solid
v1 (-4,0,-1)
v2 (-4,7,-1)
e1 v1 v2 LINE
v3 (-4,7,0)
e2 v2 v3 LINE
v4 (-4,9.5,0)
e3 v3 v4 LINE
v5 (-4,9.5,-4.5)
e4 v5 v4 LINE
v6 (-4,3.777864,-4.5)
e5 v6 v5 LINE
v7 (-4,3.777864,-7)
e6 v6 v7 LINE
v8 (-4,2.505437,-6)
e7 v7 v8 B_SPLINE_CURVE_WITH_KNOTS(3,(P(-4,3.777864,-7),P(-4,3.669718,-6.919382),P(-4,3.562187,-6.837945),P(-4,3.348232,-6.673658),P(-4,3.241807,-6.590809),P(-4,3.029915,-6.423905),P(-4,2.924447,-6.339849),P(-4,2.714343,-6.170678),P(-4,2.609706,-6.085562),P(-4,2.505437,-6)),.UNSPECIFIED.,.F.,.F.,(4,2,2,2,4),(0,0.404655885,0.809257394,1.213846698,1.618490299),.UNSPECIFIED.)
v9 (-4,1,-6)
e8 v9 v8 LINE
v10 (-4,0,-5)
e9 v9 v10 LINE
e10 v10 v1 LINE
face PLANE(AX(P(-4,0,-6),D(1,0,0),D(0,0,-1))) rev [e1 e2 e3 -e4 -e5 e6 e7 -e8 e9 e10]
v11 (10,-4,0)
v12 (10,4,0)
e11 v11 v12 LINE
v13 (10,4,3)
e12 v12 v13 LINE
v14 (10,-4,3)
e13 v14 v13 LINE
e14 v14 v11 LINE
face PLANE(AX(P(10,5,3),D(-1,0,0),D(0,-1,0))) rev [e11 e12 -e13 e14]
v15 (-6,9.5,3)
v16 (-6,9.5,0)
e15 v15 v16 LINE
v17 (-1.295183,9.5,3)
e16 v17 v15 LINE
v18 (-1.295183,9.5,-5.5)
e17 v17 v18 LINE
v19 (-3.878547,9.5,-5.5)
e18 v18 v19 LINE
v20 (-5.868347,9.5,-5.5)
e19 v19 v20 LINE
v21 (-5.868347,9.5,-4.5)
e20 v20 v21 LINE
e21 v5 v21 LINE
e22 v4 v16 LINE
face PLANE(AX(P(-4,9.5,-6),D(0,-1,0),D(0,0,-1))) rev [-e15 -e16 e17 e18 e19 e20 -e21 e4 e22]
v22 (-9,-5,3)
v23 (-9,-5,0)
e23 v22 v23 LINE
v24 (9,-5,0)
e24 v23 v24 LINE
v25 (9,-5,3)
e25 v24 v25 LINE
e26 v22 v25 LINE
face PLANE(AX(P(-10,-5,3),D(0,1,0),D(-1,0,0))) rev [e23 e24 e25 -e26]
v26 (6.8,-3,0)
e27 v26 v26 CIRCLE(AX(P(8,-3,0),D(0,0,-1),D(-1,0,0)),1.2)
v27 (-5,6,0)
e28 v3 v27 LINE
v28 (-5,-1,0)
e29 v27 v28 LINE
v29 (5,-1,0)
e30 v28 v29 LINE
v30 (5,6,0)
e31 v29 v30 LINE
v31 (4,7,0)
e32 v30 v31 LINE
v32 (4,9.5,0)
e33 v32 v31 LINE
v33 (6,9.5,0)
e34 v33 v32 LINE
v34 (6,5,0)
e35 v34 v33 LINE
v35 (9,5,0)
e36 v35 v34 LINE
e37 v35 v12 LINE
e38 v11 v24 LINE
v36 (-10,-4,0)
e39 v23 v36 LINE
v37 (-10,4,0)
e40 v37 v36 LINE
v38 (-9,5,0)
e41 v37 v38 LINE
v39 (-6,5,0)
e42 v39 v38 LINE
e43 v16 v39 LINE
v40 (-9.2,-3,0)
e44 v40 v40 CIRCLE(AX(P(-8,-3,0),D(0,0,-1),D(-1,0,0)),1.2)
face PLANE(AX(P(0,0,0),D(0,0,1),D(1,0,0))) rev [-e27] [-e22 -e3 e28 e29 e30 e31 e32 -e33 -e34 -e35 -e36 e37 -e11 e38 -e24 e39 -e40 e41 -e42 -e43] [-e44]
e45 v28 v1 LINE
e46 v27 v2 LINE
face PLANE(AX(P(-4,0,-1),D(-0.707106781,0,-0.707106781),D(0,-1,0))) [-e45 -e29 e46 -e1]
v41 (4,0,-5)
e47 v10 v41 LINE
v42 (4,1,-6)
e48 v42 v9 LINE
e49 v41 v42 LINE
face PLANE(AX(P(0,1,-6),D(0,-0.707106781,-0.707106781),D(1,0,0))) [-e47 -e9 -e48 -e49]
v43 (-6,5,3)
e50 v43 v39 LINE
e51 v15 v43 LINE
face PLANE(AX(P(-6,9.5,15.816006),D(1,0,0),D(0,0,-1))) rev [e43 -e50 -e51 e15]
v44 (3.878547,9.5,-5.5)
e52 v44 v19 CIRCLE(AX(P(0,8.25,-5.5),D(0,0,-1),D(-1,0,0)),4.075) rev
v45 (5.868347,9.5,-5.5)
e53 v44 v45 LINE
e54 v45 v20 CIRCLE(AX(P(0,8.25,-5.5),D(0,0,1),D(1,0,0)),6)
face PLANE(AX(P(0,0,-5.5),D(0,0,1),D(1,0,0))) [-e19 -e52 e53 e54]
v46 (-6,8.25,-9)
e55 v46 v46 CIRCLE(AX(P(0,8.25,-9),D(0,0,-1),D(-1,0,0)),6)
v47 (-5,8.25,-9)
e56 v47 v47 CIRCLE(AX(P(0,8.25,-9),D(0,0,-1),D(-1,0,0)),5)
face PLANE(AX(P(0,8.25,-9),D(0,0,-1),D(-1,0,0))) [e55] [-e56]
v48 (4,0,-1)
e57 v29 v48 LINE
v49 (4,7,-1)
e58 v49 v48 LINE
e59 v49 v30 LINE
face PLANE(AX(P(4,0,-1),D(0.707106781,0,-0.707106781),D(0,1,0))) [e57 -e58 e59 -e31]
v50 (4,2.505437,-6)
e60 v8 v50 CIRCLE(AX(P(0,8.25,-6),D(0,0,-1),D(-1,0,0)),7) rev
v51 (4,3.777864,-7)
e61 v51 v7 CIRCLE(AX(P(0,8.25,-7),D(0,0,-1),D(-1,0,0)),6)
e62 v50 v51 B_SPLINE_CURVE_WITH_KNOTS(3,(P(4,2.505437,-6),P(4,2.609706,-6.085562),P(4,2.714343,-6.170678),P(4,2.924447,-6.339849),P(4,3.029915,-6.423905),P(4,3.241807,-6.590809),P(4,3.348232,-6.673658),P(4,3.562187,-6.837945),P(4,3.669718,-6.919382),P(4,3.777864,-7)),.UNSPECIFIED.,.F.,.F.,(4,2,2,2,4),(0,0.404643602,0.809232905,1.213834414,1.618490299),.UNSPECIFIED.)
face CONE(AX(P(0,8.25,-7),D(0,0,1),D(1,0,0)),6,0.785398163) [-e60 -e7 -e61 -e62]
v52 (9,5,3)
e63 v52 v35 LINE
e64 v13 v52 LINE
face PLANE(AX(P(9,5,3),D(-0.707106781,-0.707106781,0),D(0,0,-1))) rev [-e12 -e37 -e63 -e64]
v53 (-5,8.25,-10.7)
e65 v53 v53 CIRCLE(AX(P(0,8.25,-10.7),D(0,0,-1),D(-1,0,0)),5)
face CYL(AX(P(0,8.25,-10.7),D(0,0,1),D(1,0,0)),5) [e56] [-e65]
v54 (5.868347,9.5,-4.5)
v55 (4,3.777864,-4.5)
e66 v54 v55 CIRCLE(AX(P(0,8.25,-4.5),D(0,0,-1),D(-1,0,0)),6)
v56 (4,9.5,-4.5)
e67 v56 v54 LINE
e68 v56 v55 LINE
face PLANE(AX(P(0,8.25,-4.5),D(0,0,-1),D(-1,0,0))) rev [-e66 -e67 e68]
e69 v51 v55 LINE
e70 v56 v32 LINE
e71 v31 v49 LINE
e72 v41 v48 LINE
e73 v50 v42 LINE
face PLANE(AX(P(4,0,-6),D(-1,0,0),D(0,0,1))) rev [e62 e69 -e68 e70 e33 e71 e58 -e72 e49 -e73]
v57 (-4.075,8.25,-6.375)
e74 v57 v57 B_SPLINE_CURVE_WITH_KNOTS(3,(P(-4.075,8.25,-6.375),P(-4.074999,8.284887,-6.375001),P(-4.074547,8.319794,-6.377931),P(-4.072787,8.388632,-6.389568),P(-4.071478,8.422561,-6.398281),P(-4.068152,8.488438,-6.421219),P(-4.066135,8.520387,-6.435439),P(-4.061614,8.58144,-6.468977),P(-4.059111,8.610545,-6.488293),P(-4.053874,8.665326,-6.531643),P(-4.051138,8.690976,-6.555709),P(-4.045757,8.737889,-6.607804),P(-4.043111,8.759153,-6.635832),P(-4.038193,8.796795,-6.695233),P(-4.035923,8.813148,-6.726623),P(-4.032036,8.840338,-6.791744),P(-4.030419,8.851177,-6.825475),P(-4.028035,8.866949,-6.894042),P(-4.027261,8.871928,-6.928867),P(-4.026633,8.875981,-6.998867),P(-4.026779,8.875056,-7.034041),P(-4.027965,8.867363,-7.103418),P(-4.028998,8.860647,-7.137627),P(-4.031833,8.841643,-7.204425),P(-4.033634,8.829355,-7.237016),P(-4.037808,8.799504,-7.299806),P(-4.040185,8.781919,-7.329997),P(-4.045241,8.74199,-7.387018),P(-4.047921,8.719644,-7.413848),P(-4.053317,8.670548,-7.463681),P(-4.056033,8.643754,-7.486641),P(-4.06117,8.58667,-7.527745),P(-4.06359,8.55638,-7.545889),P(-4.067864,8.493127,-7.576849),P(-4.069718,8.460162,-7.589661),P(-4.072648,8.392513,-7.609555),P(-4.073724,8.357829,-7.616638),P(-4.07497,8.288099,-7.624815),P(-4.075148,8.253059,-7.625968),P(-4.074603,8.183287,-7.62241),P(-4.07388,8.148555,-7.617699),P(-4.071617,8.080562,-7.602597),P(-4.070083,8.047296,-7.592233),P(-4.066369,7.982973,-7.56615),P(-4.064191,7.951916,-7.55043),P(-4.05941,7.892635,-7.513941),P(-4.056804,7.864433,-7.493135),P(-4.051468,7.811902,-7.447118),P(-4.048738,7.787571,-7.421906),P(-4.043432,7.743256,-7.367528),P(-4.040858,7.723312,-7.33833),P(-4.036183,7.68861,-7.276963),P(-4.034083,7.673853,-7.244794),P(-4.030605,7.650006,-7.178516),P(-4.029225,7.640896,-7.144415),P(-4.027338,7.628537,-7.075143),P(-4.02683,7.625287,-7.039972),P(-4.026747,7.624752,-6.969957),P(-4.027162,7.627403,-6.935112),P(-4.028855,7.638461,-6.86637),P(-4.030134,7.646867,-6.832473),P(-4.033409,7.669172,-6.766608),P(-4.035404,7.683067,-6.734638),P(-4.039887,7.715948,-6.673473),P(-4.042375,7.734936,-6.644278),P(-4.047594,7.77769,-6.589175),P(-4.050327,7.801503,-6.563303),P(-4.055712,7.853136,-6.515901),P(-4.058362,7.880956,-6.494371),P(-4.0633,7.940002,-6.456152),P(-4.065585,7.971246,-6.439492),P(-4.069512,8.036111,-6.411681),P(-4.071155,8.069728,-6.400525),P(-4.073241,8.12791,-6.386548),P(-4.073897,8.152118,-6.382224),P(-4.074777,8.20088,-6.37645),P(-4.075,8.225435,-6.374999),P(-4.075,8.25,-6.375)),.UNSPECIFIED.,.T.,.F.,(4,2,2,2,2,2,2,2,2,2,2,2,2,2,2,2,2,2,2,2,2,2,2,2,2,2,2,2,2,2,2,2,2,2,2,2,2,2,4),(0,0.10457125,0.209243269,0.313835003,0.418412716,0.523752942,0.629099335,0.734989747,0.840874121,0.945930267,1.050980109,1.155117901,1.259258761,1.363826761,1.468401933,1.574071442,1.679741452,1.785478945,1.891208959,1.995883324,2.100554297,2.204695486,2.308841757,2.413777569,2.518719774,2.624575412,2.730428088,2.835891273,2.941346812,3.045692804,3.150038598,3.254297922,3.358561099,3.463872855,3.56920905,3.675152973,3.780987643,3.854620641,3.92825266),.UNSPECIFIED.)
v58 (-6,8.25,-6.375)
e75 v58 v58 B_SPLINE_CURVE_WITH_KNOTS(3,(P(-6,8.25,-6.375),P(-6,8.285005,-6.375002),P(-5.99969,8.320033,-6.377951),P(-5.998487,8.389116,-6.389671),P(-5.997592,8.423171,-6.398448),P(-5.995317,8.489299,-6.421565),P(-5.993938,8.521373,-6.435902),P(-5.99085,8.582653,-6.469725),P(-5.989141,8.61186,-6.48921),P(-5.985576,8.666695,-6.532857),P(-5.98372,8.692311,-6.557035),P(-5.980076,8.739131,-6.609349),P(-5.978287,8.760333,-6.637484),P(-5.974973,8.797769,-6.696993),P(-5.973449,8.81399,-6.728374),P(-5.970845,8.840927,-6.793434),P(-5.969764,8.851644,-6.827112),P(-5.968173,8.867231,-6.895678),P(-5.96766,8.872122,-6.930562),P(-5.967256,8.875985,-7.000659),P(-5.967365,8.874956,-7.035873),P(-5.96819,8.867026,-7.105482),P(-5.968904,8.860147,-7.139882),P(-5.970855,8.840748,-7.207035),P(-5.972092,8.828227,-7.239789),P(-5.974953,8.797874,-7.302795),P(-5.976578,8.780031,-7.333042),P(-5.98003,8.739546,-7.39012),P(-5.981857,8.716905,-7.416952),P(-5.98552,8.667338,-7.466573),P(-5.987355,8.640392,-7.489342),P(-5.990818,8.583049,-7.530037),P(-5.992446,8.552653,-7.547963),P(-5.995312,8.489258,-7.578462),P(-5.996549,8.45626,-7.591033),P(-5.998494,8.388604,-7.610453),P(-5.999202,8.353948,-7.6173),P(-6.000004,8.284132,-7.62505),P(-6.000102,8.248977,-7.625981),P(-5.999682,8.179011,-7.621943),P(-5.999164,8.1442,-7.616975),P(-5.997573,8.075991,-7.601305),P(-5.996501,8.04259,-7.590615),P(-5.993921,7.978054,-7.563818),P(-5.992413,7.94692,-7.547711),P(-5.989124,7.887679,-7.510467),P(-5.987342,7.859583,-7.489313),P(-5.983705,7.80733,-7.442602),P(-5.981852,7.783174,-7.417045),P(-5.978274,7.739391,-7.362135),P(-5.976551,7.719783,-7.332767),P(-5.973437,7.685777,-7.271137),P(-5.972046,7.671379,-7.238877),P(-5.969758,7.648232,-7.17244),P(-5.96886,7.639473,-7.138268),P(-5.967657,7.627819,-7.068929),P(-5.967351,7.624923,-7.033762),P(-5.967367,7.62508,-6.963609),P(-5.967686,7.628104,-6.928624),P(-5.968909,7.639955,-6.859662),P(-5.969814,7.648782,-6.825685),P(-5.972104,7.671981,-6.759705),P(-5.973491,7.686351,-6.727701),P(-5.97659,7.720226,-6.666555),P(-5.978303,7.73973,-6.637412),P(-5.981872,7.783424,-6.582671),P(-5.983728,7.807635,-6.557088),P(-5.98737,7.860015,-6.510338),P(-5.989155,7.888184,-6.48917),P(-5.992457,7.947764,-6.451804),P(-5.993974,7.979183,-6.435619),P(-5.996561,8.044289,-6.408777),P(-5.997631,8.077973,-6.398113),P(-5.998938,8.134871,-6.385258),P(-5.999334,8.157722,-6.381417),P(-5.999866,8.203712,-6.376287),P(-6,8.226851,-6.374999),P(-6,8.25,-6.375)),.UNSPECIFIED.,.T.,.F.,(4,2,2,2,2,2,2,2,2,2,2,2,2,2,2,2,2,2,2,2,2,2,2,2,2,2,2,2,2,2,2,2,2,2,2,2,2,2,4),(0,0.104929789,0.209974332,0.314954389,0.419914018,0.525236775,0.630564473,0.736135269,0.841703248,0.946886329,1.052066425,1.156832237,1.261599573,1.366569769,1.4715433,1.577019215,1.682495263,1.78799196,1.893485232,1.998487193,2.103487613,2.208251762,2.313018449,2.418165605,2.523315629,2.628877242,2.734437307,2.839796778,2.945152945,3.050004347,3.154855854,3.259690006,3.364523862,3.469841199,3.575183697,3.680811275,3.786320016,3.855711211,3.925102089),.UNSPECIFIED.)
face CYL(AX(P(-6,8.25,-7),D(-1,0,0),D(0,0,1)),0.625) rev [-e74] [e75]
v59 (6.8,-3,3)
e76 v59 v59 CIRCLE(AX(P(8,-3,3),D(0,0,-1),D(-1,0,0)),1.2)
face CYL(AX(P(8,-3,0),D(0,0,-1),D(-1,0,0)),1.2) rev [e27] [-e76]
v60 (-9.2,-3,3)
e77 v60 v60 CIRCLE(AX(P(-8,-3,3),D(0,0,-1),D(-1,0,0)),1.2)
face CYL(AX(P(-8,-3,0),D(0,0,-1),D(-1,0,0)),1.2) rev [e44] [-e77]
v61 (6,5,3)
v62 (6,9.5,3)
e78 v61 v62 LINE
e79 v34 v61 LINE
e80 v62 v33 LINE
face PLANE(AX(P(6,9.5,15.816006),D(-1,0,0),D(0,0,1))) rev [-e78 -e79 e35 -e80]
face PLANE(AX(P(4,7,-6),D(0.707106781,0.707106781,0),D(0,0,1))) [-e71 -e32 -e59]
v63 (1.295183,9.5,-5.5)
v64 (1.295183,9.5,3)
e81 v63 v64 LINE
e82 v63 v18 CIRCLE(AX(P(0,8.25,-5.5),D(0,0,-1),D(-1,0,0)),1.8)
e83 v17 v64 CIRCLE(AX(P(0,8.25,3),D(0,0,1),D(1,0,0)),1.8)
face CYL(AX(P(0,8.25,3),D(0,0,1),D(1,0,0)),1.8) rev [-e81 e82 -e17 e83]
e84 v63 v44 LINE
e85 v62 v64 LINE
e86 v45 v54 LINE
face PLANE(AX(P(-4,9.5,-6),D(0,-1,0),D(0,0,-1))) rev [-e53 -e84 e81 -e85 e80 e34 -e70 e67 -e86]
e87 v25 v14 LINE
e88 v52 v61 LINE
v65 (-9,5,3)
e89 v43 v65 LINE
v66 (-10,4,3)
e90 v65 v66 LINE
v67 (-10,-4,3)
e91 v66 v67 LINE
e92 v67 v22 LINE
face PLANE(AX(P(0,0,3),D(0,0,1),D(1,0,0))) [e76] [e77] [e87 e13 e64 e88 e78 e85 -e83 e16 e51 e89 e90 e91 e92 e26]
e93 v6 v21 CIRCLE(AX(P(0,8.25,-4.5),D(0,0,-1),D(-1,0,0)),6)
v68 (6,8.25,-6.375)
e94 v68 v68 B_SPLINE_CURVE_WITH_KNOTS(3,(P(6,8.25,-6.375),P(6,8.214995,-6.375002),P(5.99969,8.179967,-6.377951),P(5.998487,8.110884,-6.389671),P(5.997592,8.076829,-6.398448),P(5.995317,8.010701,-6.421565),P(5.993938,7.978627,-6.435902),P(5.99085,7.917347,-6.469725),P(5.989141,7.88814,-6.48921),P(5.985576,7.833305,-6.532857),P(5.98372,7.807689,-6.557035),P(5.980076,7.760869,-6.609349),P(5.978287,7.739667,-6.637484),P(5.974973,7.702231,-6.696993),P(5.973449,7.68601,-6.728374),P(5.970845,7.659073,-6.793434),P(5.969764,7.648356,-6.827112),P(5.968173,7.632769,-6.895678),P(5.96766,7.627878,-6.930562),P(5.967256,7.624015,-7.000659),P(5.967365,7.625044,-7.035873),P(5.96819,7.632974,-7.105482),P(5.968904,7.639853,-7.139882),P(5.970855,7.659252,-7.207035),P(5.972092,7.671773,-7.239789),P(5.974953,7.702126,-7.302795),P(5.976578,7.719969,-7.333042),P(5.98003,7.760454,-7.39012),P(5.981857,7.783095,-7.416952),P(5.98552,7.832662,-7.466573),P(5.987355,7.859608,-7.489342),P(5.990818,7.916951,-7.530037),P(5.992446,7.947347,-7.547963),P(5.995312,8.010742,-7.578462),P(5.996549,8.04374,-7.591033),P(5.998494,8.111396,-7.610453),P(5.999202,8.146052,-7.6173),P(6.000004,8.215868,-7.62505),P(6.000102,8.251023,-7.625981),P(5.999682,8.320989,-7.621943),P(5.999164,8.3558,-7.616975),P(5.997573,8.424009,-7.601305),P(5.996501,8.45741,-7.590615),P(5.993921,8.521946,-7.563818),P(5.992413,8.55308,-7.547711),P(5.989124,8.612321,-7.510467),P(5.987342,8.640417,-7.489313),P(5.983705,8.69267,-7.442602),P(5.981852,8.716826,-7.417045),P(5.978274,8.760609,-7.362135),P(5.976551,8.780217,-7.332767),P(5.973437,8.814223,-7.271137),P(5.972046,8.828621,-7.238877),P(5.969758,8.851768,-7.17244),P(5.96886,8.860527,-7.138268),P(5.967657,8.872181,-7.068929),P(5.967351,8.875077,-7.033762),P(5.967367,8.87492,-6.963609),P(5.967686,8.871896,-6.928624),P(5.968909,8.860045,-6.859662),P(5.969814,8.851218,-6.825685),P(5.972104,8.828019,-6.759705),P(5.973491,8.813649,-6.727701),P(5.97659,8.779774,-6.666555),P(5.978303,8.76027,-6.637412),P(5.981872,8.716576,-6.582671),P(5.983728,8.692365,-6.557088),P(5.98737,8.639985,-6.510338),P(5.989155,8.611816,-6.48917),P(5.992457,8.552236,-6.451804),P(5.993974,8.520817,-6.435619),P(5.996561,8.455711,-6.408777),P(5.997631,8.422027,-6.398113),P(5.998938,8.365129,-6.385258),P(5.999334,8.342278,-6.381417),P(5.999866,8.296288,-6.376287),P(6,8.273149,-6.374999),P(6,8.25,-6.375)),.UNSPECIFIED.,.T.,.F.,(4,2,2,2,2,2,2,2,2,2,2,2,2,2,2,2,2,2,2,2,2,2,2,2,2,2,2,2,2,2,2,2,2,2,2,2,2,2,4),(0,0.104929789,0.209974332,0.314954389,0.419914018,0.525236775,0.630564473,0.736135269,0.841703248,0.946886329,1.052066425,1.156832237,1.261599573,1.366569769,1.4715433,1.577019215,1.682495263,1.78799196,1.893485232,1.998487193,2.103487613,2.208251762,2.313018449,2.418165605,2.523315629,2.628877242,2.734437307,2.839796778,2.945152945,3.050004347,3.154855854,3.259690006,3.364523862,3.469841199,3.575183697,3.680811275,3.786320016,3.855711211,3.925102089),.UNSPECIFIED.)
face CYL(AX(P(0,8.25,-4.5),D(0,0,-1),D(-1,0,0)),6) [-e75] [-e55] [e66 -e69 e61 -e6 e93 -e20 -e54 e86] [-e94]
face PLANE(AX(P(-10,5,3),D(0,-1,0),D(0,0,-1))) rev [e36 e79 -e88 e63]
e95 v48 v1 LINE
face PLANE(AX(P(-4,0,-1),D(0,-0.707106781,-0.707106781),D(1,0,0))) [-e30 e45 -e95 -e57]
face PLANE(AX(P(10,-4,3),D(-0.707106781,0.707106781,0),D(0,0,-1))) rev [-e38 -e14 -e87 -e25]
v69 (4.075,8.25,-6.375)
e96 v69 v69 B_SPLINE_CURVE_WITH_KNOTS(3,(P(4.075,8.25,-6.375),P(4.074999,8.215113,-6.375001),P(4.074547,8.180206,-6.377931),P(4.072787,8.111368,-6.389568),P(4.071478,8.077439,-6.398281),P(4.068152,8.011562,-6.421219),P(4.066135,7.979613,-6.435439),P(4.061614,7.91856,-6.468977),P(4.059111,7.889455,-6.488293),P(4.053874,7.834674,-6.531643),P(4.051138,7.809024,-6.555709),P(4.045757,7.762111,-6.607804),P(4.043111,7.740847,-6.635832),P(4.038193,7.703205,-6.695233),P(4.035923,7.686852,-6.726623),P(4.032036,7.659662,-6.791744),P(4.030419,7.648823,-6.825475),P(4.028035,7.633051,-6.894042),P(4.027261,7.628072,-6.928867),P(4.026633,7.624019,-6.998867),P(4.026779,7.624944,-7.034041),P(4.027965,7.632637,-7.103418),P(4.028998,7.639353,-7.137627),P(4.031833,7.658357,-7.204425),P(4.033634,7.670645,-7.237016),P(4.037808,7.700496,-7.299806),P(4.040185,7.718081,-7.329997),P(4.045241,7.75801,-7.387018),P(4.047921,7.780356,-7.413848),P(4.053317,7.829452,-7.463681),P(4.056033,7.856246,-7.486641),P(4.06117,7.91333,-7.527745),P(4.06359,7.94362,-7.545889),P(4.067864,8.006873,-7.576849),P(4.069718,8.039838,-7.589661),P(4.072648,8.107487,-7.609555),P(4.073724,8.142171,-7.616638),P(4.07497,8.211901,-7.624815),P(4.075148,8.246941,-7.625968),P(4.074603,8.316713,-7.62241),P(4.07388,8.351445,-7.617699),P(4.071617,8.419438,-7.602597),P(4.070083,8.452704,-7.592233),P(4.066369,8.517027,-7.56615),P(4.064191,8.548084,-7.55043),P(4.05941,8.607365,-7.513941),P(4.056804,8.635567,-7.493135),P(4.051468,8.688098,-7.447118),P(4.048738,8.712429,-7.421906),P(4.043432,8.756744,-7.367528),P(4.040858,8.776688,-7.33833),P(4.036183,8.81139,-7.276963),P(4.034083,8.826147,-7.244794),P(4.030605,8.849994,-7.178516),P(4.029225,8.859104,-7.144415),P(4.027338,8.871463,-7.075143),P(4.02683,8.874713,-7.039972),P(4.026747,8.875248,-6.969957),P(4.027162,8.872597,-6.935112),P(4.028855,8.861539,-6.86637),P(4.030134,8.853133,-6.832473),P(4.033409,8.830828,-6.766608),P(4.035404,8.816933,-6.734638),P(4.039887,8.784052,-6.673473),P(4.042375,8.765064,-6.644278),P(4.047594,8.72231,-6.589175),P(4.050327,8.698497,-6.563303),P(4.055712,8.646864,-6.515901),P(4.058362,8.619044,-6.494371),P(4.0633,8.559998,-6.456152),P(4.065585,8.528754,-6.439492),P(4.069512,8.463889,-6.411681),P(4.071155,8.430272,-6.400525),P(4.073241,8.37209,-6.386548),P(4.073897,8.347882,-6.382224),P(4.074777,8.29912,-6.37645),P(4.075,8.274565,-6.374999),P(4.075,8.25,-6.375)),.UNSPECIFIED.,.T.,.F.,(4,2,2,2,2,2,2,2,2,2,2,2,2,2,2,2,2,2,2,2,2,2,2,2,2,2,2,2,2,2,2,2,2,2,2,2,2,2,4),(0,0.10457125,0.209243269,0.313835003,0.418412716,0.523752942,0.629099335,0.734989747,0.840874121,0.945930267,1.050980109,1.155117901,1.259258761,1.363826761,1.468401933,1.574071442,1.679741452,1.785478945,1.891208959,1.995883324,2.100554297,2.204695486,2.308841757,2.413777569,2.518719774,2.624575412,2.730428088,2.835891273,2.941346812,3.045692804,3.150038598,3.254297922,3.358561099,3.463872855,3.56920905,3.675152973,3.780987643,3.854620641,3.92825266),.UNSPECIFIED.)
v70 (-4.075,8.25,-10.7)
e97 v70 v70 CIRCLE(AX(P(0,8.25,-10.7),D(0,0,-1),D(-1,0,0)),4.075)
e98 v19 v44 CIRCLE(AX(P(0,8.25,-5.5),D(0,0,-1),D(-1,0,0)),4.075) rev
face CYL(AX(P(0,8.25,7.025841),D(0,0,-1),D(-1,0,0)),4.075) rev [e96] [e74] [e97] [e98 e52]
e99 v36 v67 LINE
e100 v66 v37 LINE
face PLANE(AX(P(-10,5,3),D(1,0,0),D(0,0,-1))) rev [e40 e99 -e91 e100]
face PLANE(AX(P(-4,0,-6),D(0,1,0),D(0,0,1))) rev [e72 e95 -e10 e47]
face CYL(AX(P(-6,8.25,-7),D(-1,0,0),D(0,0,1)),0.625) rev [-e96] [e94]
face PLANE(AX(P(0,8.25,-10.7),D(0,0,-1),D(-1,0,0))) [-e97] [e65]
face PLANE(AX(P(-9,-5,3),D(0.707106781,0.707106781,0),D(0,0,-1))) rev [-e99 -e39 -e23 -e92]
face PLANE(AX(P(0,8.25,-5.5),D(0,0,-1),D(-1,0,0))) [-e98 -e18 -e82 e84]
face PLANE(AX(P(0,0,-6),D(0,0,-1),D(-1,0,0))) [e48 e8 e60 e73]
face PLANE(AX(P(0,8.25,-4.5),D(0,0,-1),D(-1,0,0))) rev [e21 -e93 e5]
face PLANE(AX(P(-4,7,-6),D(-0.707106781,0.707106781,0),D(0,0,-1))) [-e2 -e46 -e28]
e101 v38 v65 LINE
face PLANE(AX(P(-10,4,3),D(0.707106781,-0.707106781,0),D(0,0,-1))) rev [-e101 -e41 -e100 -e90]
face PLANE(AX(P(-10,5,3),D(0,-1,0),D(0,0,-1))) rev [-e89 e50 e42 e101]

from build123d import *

# Parameters (mm, degrees)
SKETCH1_W                = 20
SKETCH1_H                = 10
BOSS_EXTRUDE1_DEPTH      = 3
SKETCH2_W                = 8
SKETCH2_H                = 9.5
BOSS_EXTRUDE2_DEPTH      = 6
BOSS_EXTRUDE3_DEPTH      = 6
BOSS_EXTRUDE3_DEPTH_BACK = 1.5
SKETCH3_R                = 6
CHAMFER1_SIZE            = 1
CHAMFER2_SIZE            = 1
CHAMFER3_SIZE            = 1
CHAMFER4_SIZE            = 2
CHAMFER5_SIZE            = 2
M2_CLEARANCE_HOLE1_D     = 2.4
SKETCH21_R               = 4.075
CUT_EXTRUDE10_DEPTH      = 6.5
SKETCH25_W               = 12
SKETCH25_H               = 4.5
BOSS_EXTRUDE6_DEPTH      = 3
M1_6_TAPPED_HOLE2_D      = 1.25
CUT_EXTRUDE15_START      = -3
SKETCH40_R               = 6
CUT_EXTRUDE15_DEPTH      = 3
BOSS_EXTRUDE8_START      = 1.7
SKETCH41_R               = 5
SKETCH41_R_2             = 4.075
BOSS_EXTRUDE8_DEPTH      = 1.7
CUT_EXTRUDE16_DEPTH      = 1


with BuildPart() as part:
    # Sketch1 → Boss-Extrude1 (new body)
    with BuildSketch(Plane.XY):
        Rectangle(SKETCH1_W, SKETCH1_H)
    extrude(amount=BOSS_EXTRUDE1_DEPTH)

    # Sketch2 → Boss-Extrude2 (add)
    with BuildSketch(Plane(origin=(0, 0, 0), x_dir=(-1, 0, 0), z_dir=(0, 0, -1))):
        with Locations((0, 4.75)):
            Rectangle(SKETCH2_W, SKETCH2_H)
    extrude(amount=BOSS_EXTRUDE2_DEPTH)

    # Sketch3 → Boss-Extrude3 (add, two sides: drawn at the far end of the back side and taken through both)
    with BuildSketch(Plane(origin=(0, 0, -6), x_dir=(-1, 0, 0), z_dir=(0, 0, -1)).offset(-BOSS_EXTRUDE3_DEPTH_BACK)):
        with Locations((0, 8.25)):
            Circle(SKETCH3_R)
    extrude(amount=BOSS_EXTRUDE3_DEPTH + BOSS_EXTRUDE3_DEPTH_BACK)

    # Chamfer1
    chamfer1_edges = [part.edges().sort_by_distance(p)[0] for p in [
        (-10, 5, 1.5),
        (10, 5, 1.5),
        (10, -5, 1.5),
        (-10, -5, 1.5),
    ]]
    chamfer(chamfer1_edges, length=CHAMFER1_SIZE)

    # Chamfer2
    chamfer2_edges = [part.edges().sort_by_distance(p)[0] for p in [
        (4, 2.5, 0),
        (-4, 2.5, 0),
        (0, 0, 0),
        (0, 0, -6),
    ]]
    chamfer(chamfer2_edges, length=CHAMFER2_SIZE)

    # Chamfer3
    # the kernel refuses this chamfer: 1 mm, written as the material it adds along each edge
    with BuildSketch(Plane(origin=(0, 8.25, -6), x_dir=(0.9161991076005935, -0.4007233400138756, 0), z_dir=(0.4007233400138756, 0.9161991076005935, 0))) as chamfer3_piece_1_section:
        Polygon((6 + CHAMFER3_SIZE, 0), (6, CHAMFER3_SIZE), (6, 0), align=None)
    chamfer3_piece_1 = revolve(axis=Axis((0, 8.25, -6), (0, 0, -1)), revolution_arc=132.753188511, mode=Mode.PRIVATE)
    chamfer3_piece_1 = split(chamfer3_piece_1, bisect_by=Plane(origin=(-4, 1.761901104, -6.488098896), z_dir=(1, 0, 0)), keep=Keep.TOP, mode=Mode.PRIVATE)
    chamfer3_piece_1 = split(chamfer3_piece_1, bisect_by=Plane(origin=(4, 1.761901104, -6.488098896), z_dir=(-1, 0, 0)), keep=Keep.TOP, mode=Mode.PRIVATE)
    add(chamfer3_piece_1)

    # Chamfer4
    chamfer4_edges = [part.edges().sort_by_distance(p)[0] for p in [
        (0, 5, 0),
    ]]
    chamfer(chamfer4_edges, length=CHAMFER4_SIZE)

    # Chamfer5
    # the kernel refuses this chamfer: 2 mm, written as the material it adds along each edge
    with BuildSketch(Plane(origin=(4, 5, -6.143365976), x_dir=(0.9996219169112968, -0.02749587661058651, 0), z_dir=(0, 0, 1))) as chamfer5_piece_1_section:
        Polygon((CHAMFER5_SIZE * 0.999621916911, CHAMFER5_SIZE * 0.0274958766106), (-CHAMFER5_SIZE * 0.0274958766106, CHAMFER5_SIZE * 0.999621916911), (0, 0), align=None)
    chamfer5_piece_1 = extrude(amount=13.286731952, mode=Mode.PRIVATE)
    chamfer5_piece_1 = split(chamfer5_piece_1, bisect_by=Plane(origin=(4.448565439, 5.872663391, -0.551434561), z_dir=(-0.7071067811865476, 0, 0.7071067811865476)), keep=Keep.TOP, mode=Mode.PRIVATE)
    chamfer5_piece_1 = split(chamfer5_piece_1, bisect_by=Plane(origin=(4.264786899, 6.620159706, 0.379840294), z_dir=(0, -0.7071067811865476, -0.7071067811865476)), keep=Keep.TOP, mode=Mode.PRIVATE)
    chamfer5_piece_1 = split(chamfer5_piece_1, bisect_by=Plane(origin=(4.264786899, 5.872663391, 0), z_dir=(0, 0, -1)), keep=Keep.TOP, mode=Mode.PRIVATE)
    add(chamfer5_piece_1)
    with BuildSketch(Plane(origin=(4, 5, -6.143365976), x_dir=(0.9996219169112968, -0.02749587661058651, 0), z_dir=(0, 0, 1))) as chamfer5_piece_2_section:
        Polygon((CHAMFER5_SIZE * 0.999621916911, CHAMFER5_SIZE * 0.0274958766106), (-CHAMFER5_SIZE * 0.0274958766106, CHAMFER5_SIZE * 0.999621916911), (0, 0), align=None)
    chamfer5_piece_2 = extrude(amount=13.286731952, mode=Mode.PRIVATE)
    chamfer5_piece_2 = split(chamfer5_piece_2, bisect_by=Plane(origin=(5.409489173, 5.195513982, 0.409489173), z_dir=(0.7071067811865476, 0, -0.7071067811865476)), keep=Keep.TOP, mode=Mode.PRIVATE)
    chamfer5_piece_2 = split(chamfer5_piece_2, bisect_by=Plane(origin=(5.545985564, 5.195513982, 0), z_dir=(0, 0, 1)), keep=Keep.TOP, mode=Mode.PRIVATE)
    add(chamfer5_piece_2)
    with BuildSketch(Plane(origin=(4, 5, -6.143365976), x_dir=(0.9996219169112968, -0.02749587661058651, 0), z_dir=(0, 0, 1))) as chamfer5_piece_3_section:
        Polygon((CHAMFER5_SIZE * 0.999621916911, CHAMFER5_SIZE * 0.0274958766106), (-CHAMFER5_SIZE * 0.0274958766106, CHAMFER5_SIZE * 0.999621916911), (0, 0), align=None)
    chamfer5_piece_3 = extrude(amount=13.286731952, mode=Mode.PRIVATE)
    chamfer5_piece_3 = split(chamfer5_piece_3, bisect_by=Plane(origin=(5.251928591, 5.490690976, 0.251928591), z_dir=(-0.7071067811865476, 0, 0.7071067811865476)), keep=Keep.TOP, mode=Mode.PRIVATE)
    chamfer5_piece_3 = split(chamfer5_piece_3, bisect_by=Plane(origin=(4.702100532, 5.844467162, 1.155532838), z_dir=(0, -0.7071067811865476, -0.7071067811865476)), keep=Keep.TOP, mode=Mode.PRIVATE)
    chamfer5_piece_3 = split(chamfer5_piece_3, bisect_by=Plane(origin=(4.702100532, 5.490690976, 0), z_dir=(0, 0, 1)), keep=Keep.TOP, mode=Mode.PRIVATE)
    add(chamfer5_piece_3)
    with BuildSketch(Plane(origin=(-4, 5, 7.143365976), x_dir=(-0.9996219169112968, -0.027495876610586487, 0), z_dir=(0, 0, -1))) as chamfer5_piece_4_section:
        Polygon((CHAMFER5_SIZE * 0.999621916911, CHAMFER5_SIZE * 0.0274958766106), (-CHAMFER5_SIZE * 0.0274958766106, CHAMFER5_SIZE * 0.999621916911), (0, 0), align=None)
    chamfer5_piece_4 = extrude(amount=13.286731952, mode=Mode.PRIVATE)
    chamfer5_piece_4 = split(chamfer5_piece_4, bisect_by=Plane(origin=(-5.251928591, 5.490690976, 0.251928591), z_dir=(0.7071067811865476, 0, 0.7071067811865476)), keep=Keep.TOP, mode=Mode.PRIVATE)
    chamfer5_piece_4 = split(chamfer5_piece_4, bisect_by=Plane(origin=(-4.702100532, 5.844467162, 1.155532838), z_dir=(0, -0.7071067811865476, -0.7071067811865476)), keep=Keep.TOP, mode=Mode.PRIVATE)
    chamfer5_piece_4 = split(chamfer5_piece_4, bisect_by=Plane(origin=(-4.702100532, 5.490690976, 0), z_dir=(0, 0, 1)), keep=Keep.TOP, mode=Mode.PRIVATE)
    add(chamfer5_piece_4)
    with BuildSketch(Plane(origin=(-4, 5, 7.143365976), x_dir=(-0.9996219169112968, -0.027495876610586487, 0), z_dir=(0, 0, -1))) as chamfer5_piece_5_section:
        Polygon((CHAMFER5_SIZE * 0.999621916911, CHAMFER5_SIZE * 0.0274958766106), (-CHAMFER5_SIZE * 0.0274958766106, CHAMFER5_SIZE * 0.999621916911), (0, 0), align=None)
    chamfer5_piece_5 = extrude(amount=13.286731952, mode=Mode.PRIVATE)
    chamfer5_piece_5 = split(chamfer5_piece_5, bisect_by=Plane(origin=(-4.448565439, 5.872663391, -0.551434561), z_dir=(0.7071067811865476, 0, 0.7071067811865476)), keep=Keep.TOP, mode=Mode.PRIVATE)
    chamfer5_piece_5 = split(chamfer5_piece_5, bisect_by=Plane(origin=(-4.264786899, 6.620159706, 0.379840294), z_dir=(0, -0.7071067811865476, -0.7071067811865476)), keep=Keep.TOP, mode=Mode.PRIVATE)
    chamfer5_piece_5 = split(chamfer5_piece_5, bisect_by=Plane(origin=(-4.264786899, 5.872663391, 0), z_dir=(0, 0, -1)), keep=Keep.TOP, mode=Mode.PRIVATE)
    add(chamfer5_piece_5)
    with BuildSketch(Plane(origin=(-4, 5, 7.143365976), x_dir=(-0.9996219169112968, -0.027495876610586487, 0), z_dir=(0, 0, -1))) as chamfer5_piece_6_section:
        Polygon((CHAMFER5_SIZE * 0.999621916911, CHAMFER5_SIZE * 0.0274958766106), (-CHAMFER5_SIZE * 0.0274958766106, CHAMFER5_SIZE * 0.999621916911), (0, 0), align=None)
    chamfer5_piece_6 = extrude(amount=13.286731952, mode=Mode.PRIVATE)
    chamfer5_piece_6 = split(chamfer5_piece_6, bisect_by=Plane(origin=(-5.409489173, 5.195513982, 0.409489173), z_dir=(-0.7071067811865476, 0, -0.7071067811865476)), keep=Keep.TOP, mode=Mode.PRIVATE)
    chamfer5_piece_6 = split(chamfer5_piece_6, bisect_by=Plane(origin=(-5.545985564, 5.195513982, 0), z_dir=(0, 0, 1)), keep=Keep.TOP, mode=Mode.PRIVATE)
    add(chamfer5_piece_6)

    # M2 Clearance Hole1 (through all)
    with Locations(Plane(origin=(0, 0, 0), x_dir=(-1, 0, 0), z_dir=(0, 0, -1))):
        with Locations((8, -3), (-8, -3)):
            Hole(M2_CLEARANCE_HOLE1_D / 2)

    # Sketch21 → Cut-Extrude10 (cut)
    with BuildSketch(Plane(origin=(0, 0, -12), x_dir=(-1, 0, 0), z_dir=(0, 0, -1))):
        with Locations((0, 8.25)):
            Circle(SKETCH21_R)
    extrude(amount=-CUT_EXTRUDE10_DEPTH, mode=Mode.SUBTRACT)

    # Sketch25 → Boss-Extrude6 (add)
    with BuildSketch(Plane.XY):
        with Locations((0, 7.25)):
            Rectangle(SKETCH25_W, SKETCH25_H)
    extrude(amount=BOSS_EXTRUDE6_DEPTH)

    # Sketch24 → CSK SLOT for M1.6 Countersunk Flat Head (revolve, cut)
    with BuildSketch(Plane(origin=(0, 8.25, 3), x_dir=(0, -1, 0), z_dir=(1, 0, 0))):
        Polygon((0, 0), (0, 40.540774557), (0.9, 40), (0.9, 9.9), (1.8, 9), (1.8, 0), align=None)
    revolve(axis=Axis((0, 8.25, 9.35), (0, 0, -1)), mode=Mode.SUBTRACT)

    # M1.6 Tapped Hole2 (through all)
    with Locations(Plane.ZY.offset(6)):
        with Locations((-7, 8.25)):
            Hole(M1_6_TAPPED_HOLE2_D / 2)

    # Sketch40 → Cut-Extrude15 (cut)
    with BuildSketch(Plane(origin=(0, 0, -12), x_dir=(-1, 0, 0), z_dir=(0, 0, -1)).offset(CUT_EXTRUDE15_START)):
        with Locations((0, 8.25)):
            Circle(SKETCH40_R)
    extrude(amount=CUT_EXTRUDE15_DEPTH, mode=Mode.SUBTRACT)

    # Sketch41 → Boss-Extrude8 (add)
    with BuildSketch(Plane(origin=(0, 0, -9), x_dir=(-1, 0, 0), z_dir=(0, 0, -1)).offset(BOSS_EXTRUDE8_START)):
        with Locations((0, 8.25)):
            Circle(SKETCH41_R)
        with Locations((0, 8.25)):
            Circle(SKETCH41_R_2, mode=Mode.SUBTRACT)
    extrude(amount=-BOSS_EXTRUDE8_DEPTH)

    # Sketch43 → Cut-Extrude16 (cut)
    with BuildSketch(Plane.XY.offset(-4.5)):
        with BuildLine():
            Line((-4, 9.5), (-1.295183385, 9.5))
            ThreePointArc((-1.295183385, 9.5), (0, 10.05), (1.295183385, 9.5))
            Line((1.295183385, 9.5), (4, 9.5))
            Line((4, 9.5), (5.868347297, 9.5))
            ThreePointArc((5.868347297, 9.5), (0, 14.25), (-5.868347297, 9.5))
            Line((-5.868347297, 9.5), (-4, 9.5))
        make_face()
    extrude(amount=-CUT_EXTRUDE16_DEPTH, mode=Mode.SUBTRACT)


solid = part.part
